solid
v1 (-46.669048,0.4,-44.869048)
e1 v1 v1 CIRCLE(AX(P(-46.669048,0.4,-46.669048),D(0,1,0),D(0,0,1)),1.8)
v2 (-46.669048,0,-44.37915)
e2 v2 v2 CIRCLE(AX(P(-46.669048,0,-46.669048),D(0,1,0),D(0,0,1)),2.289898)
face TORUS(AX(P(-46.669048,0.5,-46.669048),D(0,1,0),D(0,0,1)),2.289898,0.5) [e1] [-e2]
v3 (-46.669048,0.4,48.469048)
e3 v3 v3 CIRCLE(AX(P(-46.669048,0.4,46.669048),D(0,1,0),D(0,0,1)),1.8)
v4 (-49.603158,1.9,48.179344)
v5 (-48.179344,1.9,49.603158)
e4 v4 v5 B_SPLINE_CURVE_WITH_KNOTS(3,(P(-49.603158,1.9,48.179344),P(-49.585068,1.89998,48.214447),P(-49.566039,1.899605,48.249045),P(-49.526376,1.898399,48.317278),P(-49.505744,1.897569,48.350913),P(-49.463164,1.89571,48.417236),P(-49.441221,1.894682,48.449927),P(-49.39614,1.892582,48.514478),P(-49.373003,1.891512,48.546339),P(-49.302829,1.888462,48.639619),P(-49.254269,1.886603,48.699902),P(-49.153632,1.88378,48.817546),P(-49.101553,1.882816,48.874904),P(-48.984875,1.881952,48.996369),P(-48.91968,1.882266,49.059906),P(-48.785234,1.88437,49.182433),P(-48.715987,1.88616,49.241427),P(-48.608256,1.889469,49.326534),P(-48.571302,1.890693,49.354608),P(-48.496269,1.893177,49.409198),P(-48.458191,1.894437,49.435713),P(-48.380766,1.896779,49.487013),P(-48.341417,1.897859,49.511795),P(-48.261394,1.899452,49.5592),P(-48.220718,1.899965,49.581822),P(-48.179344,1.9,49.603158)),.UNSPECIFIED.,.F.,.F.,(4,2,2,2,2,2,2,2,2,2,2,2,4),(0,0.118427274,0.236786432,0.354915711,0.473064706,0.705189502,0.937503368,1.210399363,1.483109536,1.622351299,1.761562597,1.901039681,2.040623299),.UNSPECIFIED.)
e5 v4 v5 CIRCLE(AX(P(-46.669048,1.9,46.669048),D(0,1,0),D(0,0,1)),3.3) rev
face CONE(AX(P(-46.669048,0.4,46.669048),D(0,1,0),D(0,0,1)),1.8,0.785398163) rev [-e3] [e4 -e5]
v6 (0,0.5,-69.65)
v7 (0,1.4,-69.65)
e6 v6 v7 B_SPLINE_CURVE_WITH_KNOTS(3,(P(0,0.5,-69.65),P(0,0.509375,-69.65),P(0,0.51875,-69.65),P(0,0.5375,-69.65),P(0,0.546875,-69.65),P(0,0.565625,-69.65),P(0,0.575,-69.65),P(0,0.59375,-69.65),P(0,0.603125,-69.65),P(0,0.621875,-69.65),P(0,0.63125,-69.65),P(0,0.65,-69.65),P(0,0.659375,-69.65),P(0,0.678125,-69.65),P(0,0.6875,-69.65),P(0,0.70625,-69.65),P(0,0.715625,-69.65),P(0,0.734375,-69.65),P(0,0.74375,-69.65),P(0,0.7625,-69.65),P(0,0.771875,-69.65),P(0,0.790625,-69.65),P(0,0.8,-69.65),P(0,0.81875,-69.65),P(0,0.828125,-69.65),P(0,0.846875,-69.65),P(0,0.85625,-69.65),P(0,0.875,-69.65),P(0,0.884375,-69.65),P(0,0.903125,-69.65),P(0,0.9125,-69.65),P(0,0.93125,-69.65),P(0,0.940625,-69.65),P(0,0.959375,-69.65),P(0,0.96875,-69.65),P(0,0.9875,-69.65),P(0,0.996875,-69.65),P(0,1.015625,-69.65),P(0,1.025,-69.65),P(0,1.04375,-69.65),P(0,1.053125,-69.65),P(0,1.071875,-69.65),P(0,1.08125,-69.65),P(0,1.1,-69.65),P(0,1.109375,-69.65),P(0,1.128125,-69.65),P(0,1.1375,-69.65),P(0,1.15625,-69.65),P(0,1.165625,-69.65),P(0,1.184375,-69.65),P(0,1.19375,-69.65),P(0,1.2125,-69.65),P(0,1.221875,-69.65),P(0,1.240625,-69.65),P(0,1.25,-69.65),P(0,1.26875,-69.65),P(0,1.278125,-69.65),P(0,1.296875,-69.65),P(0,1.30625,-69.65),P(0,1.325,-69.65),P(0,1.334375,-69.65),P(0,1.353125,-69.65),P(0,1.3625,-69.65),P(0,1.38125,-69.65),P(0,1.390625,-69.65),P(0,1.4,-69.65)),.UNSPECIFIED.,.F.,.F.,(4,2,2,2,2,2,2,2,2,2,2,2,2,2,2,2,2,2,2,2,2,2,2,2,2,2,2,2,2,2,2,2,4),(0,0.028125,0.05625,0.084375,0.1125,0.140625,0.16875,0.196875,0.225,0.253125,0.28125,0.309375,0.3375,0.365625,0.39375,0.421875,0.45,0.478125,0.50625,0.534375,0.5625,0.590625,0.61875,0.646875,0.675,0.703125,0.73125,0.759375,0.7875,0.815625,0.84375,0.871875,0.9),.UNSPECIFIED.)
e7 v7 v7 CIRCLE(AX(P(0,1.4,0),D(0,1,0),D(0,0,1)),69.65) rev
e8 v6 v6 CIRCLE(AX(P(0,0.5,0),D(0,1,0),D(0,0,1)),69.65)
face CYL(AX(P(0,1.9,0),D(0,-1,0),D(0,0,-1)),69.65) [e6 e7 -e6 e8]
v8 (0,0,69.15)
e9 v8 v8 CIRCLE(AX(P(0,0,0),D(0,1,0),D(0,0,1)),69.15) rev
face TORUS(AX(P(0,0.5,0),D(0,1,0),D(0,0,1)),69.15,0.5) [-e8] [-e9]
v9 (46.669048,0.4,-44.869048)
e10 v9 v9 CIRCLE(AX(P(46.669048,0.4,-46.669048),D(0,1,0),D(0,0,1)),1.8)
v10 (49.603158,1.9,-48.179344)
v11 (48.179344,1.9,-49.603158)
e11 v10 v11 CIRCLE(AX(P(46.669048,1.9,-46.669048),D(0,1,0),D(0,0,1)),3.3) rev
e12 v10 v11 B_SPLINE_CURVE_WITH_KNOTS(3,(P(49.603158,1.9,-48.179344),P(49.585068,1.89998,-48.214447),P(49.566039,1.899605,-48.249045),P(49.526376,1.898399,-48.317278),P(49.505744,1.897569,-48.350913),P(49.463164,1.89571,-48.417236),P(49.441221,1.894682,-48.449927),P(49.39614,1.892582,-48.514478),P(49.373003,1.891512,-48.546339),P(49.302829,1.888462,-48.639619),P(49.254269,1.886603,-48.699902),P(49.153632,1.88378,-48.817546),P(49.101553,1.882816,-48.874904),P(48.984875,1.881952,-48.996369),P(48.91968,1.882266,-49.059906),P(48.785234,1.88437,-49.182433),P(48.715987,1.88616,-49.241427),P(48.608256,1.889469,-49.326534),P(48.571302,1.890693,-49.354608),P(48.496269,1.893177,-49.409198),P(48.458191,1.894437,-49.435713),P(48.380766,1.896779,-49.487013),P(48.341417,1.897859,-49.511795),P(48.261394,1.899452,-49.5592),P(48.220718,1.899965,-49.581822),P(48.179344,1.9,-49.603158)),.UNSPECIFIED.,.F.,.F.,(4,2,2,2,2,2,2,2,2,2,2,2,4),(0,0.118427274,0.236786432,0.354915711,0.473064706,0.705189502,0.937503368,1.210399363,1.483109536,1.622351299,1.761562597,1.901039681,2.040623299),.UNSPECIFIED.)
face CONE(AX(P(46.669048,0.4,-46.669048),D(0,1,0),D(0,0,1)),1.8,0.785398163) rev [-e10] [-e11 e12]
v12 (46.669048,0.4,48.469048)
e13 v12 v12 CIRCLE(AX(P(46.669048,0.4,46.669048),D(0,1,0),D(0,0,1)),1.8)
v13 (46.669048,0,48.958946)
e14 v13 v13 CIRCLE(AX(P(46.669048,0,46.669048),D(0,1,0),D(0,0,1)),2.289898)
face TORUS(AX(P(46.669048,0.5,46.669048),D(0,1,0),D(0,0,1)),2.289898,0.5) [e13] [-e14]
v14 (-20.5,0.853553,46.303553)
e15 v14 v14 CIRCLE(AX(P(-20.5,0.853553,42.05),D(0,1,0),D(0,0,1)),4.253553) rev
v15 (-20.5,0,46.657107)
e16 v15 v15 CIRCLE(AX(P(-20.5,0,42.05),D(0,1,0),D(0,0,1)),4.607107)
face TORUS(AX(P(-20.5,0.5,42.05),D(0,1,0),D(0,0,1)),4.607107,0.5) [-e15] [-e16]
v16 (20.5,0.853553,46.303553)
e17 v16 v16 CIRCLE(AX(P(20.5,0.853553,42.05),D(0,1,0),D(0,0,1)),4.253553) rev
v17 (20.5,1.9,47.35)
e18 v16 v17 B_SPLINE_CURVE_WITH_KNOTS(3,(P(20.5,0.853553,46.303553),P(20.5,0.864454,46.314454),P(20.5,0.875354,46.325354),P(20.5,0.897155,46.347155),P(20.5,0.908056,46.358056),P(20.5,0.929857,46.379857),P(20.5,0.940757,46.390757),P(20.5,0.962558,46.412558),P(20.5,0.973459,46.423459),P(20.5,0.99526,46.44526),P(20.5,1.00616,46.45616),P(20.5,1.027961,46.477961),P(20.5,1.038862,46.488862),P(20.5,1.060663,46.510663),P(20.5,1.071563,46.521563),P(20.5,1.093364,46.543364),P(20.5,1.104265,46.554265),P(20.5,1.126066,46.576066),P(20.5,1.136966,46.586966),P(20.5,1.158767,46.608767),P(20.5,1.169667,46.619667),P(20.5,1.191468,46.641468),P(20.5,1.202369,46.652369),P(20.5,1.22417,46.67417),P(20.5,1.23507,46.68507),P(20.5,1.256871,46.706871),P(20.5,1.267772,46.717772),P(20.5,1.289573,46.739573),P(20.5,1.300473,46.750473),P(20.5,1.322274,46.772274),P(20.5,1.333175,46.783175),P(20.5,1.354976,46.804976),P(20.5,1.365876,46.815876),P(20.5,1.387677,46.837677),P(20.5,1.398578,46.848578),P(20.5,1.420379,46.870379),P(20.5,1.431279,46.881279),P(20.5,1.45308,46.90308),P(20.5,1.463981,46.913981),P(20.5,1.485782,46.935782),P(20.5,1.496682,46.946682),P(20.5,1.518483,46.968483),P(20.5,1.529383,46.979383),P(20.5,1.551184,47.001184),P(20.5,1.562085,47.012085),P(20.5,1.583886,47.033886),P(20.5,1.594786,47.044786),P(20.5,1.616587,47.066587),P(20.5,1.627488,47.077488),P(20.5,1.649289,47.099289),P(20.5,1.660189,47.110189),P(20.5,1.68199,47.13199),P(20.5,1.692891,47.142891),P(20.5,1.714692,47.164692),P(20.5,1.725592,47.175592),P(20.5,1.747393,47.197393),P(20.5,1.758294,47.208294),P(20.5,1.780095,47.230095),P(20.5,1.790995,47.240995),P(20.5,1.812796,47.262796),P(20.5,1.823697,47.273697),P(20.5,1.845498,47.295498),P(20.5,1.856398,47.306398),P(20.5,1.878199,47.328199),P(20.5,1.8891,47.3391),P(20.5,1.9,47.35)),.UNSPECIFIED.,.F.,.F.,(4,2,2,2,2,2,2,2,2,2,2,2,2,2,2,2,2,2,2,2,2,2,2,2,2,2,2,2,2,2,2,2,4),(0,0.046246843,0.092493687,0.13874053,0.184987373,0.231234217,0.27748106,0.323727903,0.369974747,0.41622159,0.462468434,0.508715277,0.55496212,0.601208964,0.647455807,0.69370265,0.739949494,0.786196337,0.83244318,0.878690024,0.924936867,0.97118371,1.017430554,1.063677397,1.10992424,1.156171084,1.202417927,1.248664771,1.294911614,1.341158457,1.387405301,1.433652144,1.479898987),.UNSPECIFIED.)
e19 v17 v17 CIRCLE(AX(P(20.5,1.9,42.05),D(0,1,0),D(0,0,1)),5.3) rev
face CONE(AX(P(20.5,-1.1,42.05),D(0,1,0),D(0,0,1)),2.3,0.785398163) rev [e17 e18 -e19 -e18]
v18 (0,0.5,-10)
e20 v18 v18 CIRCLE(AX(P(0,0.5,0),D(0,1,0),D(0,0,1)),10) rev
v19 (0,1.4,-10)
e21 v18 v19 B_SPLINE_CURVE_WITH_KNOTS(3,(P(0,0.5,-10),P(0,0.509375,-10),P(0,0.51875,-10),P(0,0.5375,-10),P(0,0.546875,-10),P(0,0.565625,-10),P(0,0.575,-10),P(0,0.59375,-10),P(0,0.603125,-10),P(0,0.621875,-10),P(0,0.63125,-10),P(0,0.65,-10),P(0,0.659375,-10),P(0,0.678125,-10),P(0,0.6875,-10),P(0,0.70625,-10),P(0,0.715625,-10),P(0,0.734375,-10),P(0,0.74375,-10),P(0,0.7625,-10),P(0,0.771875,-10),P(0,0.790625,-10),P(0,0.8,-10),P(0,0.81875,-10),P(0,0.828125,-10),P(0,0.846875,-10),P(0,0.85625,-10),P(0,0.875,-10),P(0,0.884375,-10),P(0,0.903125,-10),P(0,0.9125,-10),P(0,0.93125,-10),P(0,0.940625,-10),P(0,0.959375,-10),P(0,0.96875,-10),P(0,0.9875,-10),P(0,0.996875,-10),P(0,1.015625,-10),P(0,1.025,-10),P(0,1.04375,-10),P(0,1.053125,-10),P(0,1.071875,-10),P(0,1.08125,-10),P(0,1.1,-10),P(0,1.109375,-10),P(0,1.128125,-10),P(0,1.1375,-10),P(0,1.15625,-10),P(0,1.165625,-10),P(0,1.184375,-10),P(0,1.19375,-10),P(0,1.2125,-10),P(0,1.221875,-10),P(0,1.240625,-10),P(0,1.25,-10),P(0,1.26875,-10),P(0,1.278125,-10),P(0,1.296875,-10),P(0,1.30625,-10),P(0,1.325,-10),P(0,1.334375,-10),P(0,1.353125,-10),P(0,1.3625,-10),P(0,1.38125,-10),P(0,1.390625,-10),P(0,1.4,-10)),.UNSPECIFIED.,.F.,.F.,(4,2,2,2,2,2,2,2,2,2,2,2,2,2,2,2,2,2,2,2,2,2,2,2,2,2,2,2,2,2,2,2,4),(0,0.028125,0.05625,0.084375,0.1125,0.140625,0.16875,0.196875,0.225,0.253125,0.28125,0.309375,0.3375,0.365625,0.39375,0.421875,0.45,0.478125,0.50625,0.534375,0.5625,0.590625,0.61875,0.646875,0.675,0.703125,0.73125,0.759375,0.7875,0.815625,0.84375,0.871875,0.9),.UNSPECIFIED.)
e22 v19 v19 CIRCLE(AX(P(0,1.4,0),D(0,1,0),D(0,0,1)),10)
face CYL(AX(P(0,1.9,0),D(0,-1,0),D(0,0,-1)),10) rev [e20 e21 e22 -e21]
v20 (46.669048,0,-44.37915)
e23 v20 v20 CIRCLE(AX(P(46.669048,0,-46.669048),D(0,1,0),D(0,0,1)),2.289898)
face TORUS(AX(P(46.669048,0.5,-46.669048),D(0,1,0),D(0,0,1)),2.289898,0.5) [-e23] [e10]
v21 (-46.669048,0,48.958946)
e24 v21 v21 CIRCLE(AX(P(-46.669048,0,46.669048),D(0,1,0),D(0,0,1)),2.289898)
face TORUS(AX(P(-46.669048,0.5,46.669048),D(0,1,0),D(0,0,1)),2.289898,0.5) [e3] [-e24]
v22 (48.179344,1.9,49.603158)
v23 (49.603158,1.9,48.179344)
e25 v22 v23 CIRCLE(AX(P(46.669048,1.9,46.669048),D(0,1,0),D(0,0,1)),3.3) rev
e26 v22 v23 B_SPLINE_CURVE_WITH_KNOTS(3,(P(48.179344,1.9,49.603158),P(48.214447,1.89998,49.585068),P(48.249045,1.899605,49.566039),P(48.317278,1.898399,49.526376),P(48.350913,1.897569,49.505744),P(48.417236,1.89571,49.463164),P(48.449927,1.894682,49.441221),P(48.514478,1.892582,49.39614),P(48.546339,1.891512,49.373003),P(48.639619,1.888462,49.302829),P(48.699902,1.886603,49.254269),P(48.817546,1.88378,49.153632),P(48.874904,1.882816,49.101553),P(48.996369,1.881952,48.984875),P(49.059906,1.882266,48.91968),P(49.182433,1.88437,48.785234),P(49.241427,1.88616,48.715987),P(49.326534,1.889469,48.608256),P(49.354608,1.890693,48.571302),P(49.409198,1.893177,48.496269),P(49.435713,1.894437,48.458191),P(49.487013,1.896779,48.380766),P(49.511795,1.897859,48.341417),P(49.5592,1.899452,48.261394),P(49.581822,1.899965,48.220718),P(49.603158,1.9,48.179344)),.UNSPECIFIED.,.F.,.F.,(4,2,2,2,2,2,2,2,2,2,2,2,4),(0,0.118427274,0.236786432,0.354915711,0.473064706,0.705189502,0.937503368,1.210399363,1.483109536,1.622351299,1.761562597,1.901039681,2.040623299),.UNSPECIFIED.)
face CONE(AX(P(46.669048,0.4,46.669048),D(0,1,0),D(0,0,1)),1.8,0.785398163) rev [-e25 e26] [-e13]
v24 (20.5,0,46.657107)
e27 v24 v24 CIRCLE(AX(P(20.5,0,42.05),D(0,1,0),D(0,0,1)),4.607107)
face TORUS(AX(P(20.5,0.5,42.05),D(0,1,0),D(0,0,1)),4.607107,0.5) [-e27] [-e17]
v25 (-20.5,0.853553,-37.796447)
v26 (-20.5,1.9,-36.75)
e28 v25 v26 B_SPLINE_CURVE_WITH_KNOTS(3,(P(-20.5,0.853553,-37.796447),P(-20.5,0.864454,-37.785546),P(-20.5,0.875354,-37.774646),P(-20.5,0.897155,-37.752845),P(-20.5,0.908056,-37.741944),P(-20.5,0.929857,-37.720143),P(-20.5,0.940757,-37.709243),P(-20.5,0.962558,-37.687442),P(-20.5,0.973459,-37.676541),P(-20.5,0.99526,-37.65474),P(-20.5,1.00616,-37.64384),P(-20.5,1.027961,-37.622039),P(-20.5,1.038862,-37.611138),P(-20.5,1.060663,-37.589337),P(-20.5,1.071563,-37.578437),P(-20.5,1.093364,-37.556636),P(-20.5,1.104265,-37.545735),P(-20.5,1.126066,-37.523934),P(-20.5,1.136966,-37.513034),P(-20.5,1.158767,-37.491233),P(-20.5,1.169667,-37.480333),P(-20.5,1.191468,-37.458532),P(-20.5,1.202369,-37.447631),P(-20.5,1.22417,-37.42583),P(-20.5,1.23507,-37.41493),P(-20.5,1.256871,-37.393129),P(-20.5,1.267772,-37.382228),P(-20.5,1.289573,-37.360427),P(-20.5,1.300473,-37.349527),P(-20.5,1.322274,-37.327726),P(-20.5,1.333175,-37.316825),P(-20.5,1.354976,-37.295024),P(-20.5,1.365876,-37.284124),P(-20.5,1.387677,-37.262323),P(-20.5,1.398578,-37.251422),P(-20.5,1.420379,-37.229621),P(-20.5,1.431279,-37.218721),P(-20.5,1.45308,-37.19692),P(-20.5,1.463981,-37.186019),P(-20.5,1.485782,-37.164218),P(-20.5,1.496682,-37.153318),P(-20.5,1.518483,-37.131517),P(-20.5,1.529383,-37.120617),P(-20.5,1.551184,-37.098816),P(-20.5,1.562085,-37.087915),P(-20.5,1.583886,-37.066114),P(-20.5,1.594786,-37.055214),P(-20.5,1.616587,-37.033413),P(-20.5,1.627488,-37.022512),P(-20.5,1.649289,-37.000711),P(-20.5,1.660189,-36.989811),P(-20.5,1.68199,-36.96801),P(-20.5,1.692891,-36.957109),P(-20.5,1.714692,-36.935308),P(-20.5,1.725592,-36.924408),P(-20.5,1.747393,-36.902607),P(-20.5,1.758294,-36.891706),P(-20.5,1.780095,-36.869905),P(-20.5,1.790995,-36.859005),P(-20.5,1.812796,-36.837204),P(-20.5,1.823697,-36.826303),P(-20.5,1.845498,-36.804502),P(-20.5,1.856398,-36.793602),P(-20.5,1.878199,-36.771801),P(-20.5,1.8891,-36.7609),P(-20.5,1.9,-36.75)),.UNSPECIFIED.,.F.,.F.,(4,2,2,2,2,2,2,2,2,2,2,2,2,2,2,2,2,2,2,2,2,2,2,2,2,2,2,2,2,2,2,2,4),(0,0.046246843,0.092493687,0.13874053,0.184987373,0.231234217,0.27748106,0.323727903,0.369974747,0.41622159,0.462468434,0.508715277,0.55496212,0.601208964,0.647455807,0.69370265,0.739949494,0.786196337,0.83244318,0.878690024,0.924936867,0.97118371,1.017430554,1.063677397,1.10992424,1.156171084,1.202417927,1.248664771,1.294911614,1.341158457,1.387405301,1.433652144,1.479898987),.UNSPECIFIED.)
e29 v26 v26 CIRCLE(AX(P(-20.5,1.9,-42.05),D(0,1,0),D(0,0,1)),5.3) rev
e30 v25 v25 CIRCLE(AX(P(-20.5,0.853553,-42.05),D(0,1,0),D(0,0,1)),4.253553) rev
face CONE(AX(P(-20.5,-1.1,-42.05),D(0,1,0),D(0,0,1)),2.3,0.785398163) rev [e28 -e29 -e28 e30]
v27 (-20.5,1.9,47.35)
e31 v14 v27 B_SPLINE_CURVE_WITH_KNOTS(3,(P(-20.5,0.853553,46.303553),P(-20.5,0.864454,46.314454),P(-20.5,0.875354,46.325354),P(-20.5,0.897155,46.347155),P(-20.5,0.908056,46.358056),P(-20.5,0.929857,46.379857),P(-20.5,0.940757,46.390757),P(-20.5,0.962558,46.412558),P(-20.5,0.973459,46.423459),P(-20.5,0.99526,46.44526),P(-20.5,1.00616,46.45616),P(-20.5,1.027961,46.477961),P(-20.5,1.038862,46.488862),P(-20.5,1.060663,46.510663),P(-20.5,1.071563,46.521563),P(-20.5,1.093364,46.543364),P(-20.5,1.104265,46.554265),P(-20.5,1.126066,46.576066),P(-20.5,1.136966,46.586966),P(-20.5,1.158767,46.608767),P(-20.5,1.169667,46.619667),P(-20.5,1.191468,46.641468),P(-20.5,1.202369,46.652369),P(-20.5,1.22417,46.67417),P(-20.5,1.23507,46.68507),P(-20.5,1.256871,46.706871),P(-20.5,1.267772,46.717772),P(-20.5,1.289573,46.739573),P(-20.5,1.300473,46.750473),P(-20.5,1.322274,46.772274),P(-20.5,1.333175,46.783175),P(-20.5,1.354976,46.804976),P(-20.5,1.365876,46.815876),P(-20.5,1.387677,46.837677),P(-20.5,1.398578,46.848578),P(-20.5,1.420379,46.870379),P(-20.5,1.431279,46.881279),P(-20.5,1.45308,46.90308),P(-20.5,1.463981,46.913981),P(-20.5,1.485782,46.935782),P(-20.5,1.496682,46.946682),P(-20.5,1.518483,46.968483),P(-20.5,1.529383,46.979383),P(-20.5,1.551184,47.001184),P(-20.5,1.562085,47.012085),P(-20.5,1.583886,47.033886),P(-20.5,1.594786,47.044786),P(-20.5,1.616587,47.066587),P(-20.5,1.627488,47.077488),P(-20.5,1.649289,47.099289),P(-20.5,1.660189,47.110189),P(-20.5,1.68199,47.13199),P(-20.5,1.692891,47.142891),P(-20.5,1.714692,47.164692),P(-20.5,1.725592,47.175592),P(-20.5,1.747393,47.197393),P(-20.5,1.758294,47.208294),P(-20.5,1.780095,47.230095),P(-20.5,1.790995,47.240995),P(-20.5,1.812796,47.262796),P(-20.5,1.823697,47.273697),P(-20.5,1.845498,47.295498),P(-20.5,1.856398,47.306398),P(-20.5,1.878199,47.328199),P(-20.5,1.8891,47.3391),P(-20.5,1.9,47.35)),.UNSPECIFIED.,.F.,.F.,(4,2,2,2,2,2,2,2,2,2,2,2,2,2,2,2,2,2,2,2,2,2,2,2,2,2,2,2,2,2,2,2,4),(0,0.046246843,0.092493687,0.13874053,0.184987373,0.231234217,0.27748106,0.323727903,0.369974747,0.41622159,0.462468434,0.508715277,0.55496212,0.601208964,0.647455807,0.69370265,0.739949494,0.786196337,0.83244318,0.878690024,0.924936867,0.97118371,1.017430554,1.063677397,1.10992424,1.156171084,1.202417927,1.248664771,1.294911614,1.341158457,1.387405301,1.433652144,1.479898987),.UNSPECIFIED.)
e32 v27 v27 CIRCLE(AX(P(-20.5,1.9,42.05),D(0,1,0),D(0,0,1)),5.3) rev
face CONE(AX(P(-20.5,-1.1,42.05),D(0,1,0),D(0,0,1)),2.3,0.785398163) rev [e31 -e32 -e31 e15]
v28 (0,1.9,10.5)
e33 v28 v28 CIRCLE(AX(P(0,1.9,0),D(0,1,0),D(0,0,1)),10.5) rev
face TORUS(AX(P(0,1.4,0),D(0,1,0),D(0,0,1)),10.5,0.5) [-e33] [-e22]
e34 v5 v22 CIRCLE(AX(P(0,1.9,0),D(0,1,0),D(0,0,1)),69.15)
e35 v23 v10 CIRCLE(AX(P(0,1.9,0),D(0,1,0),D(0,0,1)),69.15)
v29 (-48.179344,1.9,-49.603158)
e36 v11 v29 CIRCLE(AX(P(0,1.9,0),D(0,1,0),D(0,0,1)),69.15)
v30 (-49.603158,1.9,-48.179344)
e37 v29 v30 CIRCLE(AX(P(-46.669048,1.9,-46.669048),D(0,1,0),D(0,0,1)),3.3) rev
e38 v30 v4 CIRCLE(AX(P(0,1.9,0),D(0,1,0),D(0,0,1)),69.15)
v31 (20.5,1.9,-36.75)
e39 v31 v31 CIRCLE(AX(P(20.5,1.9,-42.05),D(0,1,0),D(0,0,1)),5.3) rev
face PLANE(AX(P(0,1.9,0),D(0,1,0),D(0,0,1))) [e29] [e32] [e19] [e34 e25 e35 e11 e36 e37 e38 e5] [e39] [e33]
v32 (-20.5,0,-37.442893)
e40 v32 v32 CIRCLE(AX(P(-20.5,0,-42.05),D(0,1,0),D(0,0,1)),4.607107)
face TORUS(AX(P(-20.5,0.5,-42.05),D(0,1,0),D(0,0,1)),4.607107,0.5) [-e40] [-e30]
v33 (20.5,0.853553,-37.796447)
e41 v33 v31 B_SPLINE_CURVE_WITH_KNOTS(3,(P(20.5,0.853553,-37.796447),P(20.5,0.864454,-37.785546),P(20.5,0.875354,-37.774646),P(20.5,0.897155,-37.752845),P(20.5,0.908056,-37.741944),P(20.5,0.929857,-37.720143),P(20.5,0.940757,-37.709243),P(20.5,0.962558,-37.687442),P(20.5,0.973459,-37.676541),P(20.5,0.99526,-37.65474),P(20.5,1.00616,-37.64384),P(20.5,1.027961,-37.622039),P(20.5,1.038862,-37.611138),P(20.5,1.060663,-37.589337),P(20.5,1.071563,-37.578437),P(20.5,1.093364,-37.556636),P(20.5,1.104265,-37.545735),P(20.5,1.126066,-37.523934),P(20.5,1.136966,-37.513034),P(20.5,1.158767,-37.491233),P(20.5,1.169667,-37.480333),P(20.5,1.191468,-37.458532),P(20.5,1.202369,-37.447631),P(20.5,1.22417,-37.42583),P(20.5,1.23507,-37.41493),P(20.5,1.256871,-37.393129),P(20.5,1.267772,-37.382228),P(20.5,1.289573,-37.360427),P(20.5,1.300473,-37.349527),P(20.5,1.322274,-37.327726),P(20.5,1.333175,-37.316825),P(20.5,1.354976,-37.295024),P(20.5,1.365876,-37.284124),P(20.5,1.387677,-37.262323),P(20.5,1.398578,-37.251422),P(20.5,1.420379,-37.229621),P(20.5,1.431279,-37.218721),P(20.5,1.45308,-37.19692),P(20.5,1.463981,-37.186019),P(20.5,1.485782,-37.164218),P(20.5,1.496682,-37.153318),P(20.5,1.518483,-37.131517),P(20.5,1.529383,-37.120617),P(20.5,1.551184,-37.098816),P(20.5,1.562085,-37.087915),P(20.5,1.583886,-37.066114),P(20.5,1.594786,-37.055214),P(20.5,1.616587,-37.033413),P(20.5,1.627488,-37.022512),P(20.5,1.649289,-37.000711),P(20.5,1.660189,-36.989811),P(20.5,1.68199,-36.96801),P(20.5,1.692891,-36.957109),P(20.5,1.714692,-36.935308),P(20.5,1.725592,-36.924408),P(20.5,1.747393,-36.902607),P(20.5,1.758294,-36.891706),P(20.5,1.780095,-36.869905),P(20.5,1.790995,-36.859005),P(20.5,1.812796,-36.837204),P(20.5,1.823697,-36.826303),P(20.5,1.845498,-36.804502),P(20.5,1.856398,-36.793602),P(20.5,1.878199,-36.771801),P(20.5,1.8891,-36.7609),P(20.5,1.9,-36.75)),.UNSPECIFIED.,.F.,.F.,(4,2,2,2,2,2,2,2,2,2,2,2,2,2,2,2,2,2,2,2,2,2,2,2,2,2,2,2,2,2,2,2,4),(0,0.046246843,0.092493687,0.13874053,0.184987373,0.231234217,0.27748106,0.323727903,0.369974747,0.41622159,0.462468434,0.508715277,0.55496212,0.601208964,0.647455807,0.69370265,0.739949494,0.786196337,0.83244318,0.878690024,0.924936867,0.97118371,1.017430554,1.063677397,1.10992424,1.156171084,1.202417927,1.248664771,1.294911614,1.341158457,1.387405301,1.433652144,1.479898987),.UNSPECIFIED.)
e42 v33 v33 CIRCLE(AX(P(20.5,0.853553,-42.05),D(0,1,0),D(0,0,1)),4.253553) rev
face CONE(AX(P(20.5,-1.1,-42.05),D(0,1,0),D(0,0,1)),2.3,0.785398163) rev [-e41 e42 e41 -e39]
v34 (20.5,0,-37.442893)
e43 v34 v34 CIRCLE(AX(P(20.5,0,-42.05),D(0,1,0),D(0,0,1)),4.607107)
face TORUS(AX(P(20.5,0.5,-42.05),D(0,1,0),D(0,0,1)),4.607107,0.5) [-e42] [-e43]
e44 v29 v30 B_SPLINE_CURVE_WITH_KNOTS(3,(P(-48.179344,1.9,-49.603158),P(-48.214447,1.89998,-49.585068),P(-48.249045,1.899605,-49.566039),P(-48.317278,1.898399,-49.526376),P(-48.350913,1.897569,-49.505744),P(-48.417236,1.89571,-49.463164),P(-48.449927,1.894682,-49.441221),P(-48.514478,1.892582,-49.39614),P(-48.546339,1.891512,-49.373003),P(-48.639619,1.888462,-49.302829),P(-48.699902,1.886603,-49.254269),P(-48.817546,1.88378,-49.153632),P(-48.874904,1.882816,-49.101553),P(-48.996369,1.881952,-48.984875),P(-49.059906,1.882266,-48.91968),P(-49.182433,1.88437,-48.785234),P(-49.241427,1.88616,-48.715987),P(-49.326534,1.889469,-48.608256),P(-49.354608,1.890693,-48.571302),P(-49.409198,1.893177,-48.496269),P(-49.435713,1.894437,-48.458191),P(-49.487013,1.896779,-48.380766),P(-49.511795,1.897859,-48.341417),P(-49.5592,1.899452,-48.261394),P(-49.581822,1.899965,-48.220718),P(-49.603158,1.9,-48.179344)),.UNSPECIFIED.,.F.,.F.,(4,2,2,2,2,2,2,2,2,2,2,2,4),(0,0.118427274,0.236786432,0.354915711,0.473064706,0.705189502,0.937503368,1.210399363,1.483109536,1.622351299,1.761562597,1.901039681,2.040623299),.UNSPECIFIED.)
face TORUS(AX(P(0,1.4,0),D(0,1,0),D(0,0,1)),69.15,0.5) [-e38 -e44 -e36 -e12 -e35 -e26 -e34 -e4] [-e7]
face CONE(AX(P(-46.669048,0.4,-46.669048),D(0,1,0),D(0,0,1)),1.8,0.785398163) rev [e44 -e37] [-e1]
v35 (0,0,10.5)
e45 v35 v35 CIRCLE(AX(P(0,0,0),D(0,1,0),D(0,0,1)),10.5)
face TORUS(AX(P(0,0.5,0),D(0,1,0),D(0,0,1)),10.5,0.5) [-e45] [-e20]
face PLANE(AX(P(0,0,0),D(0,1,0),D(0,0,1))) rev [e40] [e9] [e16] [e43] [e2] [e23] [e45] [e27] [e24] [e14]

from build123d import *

# Parameters (mm, degrees)
SKETCH1_R           = 69.65
SKETCH1_R_2         = 2.3
SKETCH1_R_3         = 10
SKETCH1_R_4         = 1.8
BOSS_EXTRUDE1_DEPTH = 1.9
CHAMFER1_SIZE       = 3
CHAMFER3_SIZE       = 1.5
FILLET2_R           = 0.5


with BuildPart() as part:
    # Sketch1 → Boss-Extrude1 (new body)
    with BuildSketch(Plane(origin=(0, 0, 0), x_dir=(1, 0, 0), z_dir=(0, 1, 0))):
        with Locations(Location((0, 0, 0), (0, 0, 90))):
            Circle(SKETCH1_R)
        with Locations(Location((-20.5, 42.05, 0), (0, 0, 90))):
            Circle(SKETCH1_R_2, mode=Mode.SUBTRACT)
        with Locations(Location((20.5, 42.05, 0), (0, 0, 90))):
            Circle(SKETCH1_R_2, mode=Mode.SUBTRACT)
        with Locations(Location((20.5, -42.05, 0), (0, 0, 90))):
            Circle(SKETCH1_R_2, mode=Mode.SUBTRACT)
        with Locations(Location((-20.5, -42.05, 0), (0, 0, 90))):
            Circle(SKETCH1_R_2, mode=Mode.SUBTRACT)
        with Locations(Location((0, 0, 0), (0, 0, 90))):
            Circle(SKETCH1_R_3, mode=Mode.SUBTRACT)
        with Locations(Location((-46.669047558, 46.669047558, 0), (0, 0, 90))):
            Circle(SKETCH1_R_4, mode=Mode.SUBTRACT)
        with Locations(Location((46.669047558, 46.669047558, 0), (0, 0, 90))):
            Circle(SKETCH1_R_4, mode=Mode.SUBTRACT)
        with Locations(Location((46.669047558, -46.669047558, 0), (0, 0, 90))):
            Circle(SKETCH1_R_4, mode=Mode.SUBTRACT)
        with Locations(Location((-46.669047558, -46.669047558, 0), (0, 0, 90))):
            Circle(SKETCH1_R_4, mode=Mode.SUBTRACT)
    extrude(amount=BOSS_EXTRUDE1_DEPTH)

    # Chamfer1
    # the kernel refuses this chamfer: 3 mm, written as the material it takes off along each edge
    with BuildSketch(Plane(origin=(-20.5, 1.9, -42.05), x_dir=(0, 0, -1), z_dir=(1, 0, 0))) as chamfer1_piece_1:
        Polygon((2.3, -CHAMFER1_SIZE), (2.3 + CHAMFER1_SIZE, 0), (2.3, 0), align=None)
    revolve(axis=Axis((-20.5, 1.9, -42.05), (0, 1, 0)), mode=Mode.SUBTRACT)
    with BuildSketch(Plane(origin=(20.5, 1.9, -42.05), x_dir=(0, 0, -1), z_dir=(1, 0, 0))) as chamfer1_piece_2:
        Polygon((2.3, -CHAMFER1_SIZE), (2.3 + CHAMFER1_SIZE, 0), (2.3, 0), align=None)
    revolve(axis=Axis((20.5, 1.9, -42.05), (0, 1, 0)), mode=Mode.SUBTRACT)
    with BuildSketch(Plane(origin=(20.5, 1.9, 42.05), x_dir=(0, 0, -1), z_dir=(1, 0, 0))) as chamfer1_piece_3:
        Polygon((2.3, -CHAMFER1_SIZE), (2.3 + CHAMFER1_SIZE, 0), (2.3, 0), align=None)
    revolve(axis=Axis((20.5, 1.9, 42.05), (0, 1, 0)), mode=Mode.SUBTRACT)
    with BuildSketch(Plane(origin=(-20.5, 1.9, 42.05), x_dir=(0, 0, -1), z_dir=(1, 0, 0))) as chamfer1_piece_4:
        Polygon((2.3, -CHAMFER1_SIZE), (2.3 + CHAMFER1_SIZE, 0), (2.3, 0), align=None)
    revolve(axis=Axis((-20.5, 1.9, 42.05), (0, 1, 0)), mode=Mode.SUBTRACT)

    # Chamfer3
    chamfer3_edges = [part.edges().sort_by_distance(p)[0] for p in [
        (-46.669047558, 1.9, 48.469047558),
        (46.669047558, 1.9, 48.469047558),
        (46.669047558, 1.9, -44.869047558),
        (-46.669047558, 1.9, -44.869047558),
    ]]
    chamfer(chamfer3_edges, length=CHAMFER3_SIZE)

    # Fillet2
    # the kernel refuses this fillet: 0.5 mm, written as the material it takes off along each edge
    with BuildSketch(Plane(origin=(0, 0, 0), x_dir=(0, 0, -1), z_dir=(1, 0, 0))) as fillet2_piece_1:
        with BuildLine():
            CenterArc((69.65 - FILLET2_R, FILLET2_R), FILLET2_R, 270, 90)
            Line((69.65 - FILLET2_R, 0), (69.65 - FILLET2_R, -FILLET2_R * 0.02))
            Line((69.65 - FILLET2_R, -FILLET2_R * 0.02), (69.65 + FILLET2_R * 0.02, -FILLET2_R * 0.02))
            Line((69.65 + FILLET2_R * 0.02, -FILLET2_R * 0.02), (69.65 + FILLET2_R * 0.02, FILLET2_R))
            Line((69.65 + FILLET2_R * 0.02, FILLET2_R), (69.65, FILLET2_R))
        make_face()
    revolve(axis=Axis((0, 0, 0), (0, 1, 0)), mode=Mode.SUBTRACT)
    with BuildSketch(Plane(origin=(0, 0, 0), x_dir=(0, 0, -1), z_dir=(1, 0, 0))) as fillet2_piece_2:
        with BuildLine():
            CenterArc((10 + FILLET2_R, FILLET2_R), FILLET2_R, 180, 90)
            Line((10 + FILLET2_R, 0), (10 + FILLET2_R, -FILLET2_R * 0.02))
            Line((10 + FILLET2_R, -FILLET2_R * 0.02), (10 - FILLET2_R * 0.02, -FILLET2_R * 0.02))
            Line((10 - FILLET2_R * 0.02, -FILLET2_R * 0.02), (10 - FILLET2_R * 0.02, FILLET2_R))
            Line((10 - FILLET2_R * 0.02, FILLET2_R), (10, FILLET2_R))
        make_face()
    revolve(axis=Axis((0, 0, 0), (0, 1, 0)), mode=Mode.SUBTRACT)
    with BuildSketch(Plane(origin=(-46.669047558, 0, -46.669047558), x_dir=(0, 0, -1), z_dir=(1, 0, 0))) as fillet2_piece_3:
        with BuildLine():
            CenterArc((2.289897949, 0.5), FILLET2_R, 191.536959033, 78.463040967)
            Line((1.8, 0.4), (1.790202041, 0.398))
            ThreePointArc((1.790202041, 0.398), (1.79, 0.2), (1.79, 0))
            Line((1.79, 0), (1.8, -0.01))
            Line((1.8, -0.01), (2.289897949, -0.01))
            Line((2.289897949, -0.01), (2.289897949, 0))
        make_face()
    revolve(axis=Axis((-46.669047558, 0, -46.669047558), (0, 1, 0)), mode=Mode.SUBTRACT)
    with BuildSketch(Plane(origin=(46.669047558, 0, -46.669047558), x_dir=(0, 0, -1), z_dir=(1, 0, 0))) as fillet2_piece_4:
        with BuildLine():
            CenterArc((2.289897949, 0.5), FILLET2_R, 191.536959033, 78.463040967)
            Line((1.8, 0.4), (1.790202041, 0.398))
            ThreePointArc((1.790202041, 0.398), (1.79, 0.2), (1.79, 0))
            Line((1.79, 0), (1.8, -0.01))
            Line((1.8, -0.01), (2.289897949, -0.01))
            Line((2.289897949, -0.01), (2.289897949, 0))
        make_face()
    revolve(axis=Axis((46.669047558, 0, -46.669047558), (0, 1, 0)), mode=Mode.SUBTRACT)
    with BuildSketch(Plane(origin=(46.669047558, 0, 46.669047558), x_dir=(0, 0, -1), z_dir=(1, 0, 0))) as fillet2_piece_5:
        with BuildLine():
            CenterArc((2.289897949, 0.5), FILLET2_R, 191.536959033, 78.463040967)
            Line((1.8, 0.4), (1.790202041, 0.398))
            ThreePointArc((1.790202041, 0.398), (1.79, 0.2), (1.79, 0))
            Line((1.79, 0), (1.8, -0.01))
            Line((1.8, -0.01), (2.289897949, -0.01))
            Line((2.289897949, -0.01), (2.289897949, 0))
        make_face()
    revolve(axis=Axis((46.669047558, 0, 46.669047558), (0, 1, 0)), mode=Mode.SUBTRACT)
    with BuildSketch(Plane(origin=(-46.669047558, 0, 46.669047558), x_dir=(0, 0, -1), z_dir=(1, 0, 0))) as fillet2_piece_6:
        with BuildLine():
            CenterArc((2.289897949, 0.5), FILLET2_R, 191.536959033, 78.463040967)
            Line((2.289897949, 0), (2.289897949, -0.01))
            Line((2.289897949, -0.01), (1.8, -0.01))
            Line((1.8, -0.01), (1.79, 0))
            ThreePointArc((1.79, 0), (1.79, 0.2), (1.790202041, 0.398))
            Line((1.790202041, 0.398), (1.8, 0.4))
        make_face()
    revolve(axis=Axis((-46.669047558, 0, 46.669047558), (0, 1, 0)), mode=Mode.SUBTRACT)
    with BuildSketch(Plane(origin=(-20.5, 0, 42.05), x_dir=(0, 0, -1), z_dir=(1, 0, 0))) as fillet2_piece_7:
        with BuildLine():
            CenterArc((3.4 + FILLET2_R * 2.41421356237, FILLET2_R), FILLET2_R, 135, 135)
            Line((3.4 + FILLET2_R * 2.41421356237, 0), (3.4 + FILLET2_R * 2.41421356237, -FILLET2_R * 0.02))
            Line((3.4 + FILLET2_R * 2.41421356237, -FILLET2_R * 0.02), (3.4, -FILLET2_R * 0.02))
            Line((3.4, -FILLET2_R * 0.02), (3.4 - FILLET2_R * 0.0141421356237, FILLET2_R * 0.0141421356237))
            Line((3.4 - FILLET2_R * 0.0141421356237, FILLET2_R * 0.0141421356237), (3.4 + FILLET2_R * 1.69296464556, FILLET2_R * 1.72124891681))
            Line((3.4 + FILLET2_R * 1.69296464556, FILLET2_R * 1.72124891681), (3.4 + FILLET2_R * 1.70710678119, FILLET2_R * 1.70710678119))
        make_face()
    revolve(axis=Axis((-20.5, 0, 42.05), (0, 1, 0)), mode=Mode.SUBTRACT)
    with BuildSketch(Plane(origin=(20.5, 0, 42.05), x_dir=(0, 0, -1), z_dir=(1, 0, 0))) as fillet2_piece_8:
        with BuildLine():
            CenterArc((3.4 + FILLET2_R * 2.41421356237, FILLET2_R), FILLET2_R, 135, 135)
            Line((3.4 + FILLET2_R * 2.41421356237, 0), (3.4 + FILLET2_R * 2.41421356237, -FILLET2_R * 0.02))
            Line((3.4 + FILLET2_R * 2.41421356237, -FILLET2_R * 0.02), (3.4, -FILLET2_R * 0.02))
            Line((3.4, -FILLET2_R * 0.02), (3.4 - FILLET2_R * 0.0141421356237, FILLET2_R * 0.0141421356237))
            Line((3.4 - FILLET2_R * 0.0141421356237, FILLET2_R * 0.0141421356237), (3.4 + FILLET2_R * 1.69296464556, FILLET2_R * 1.72124891681))
            Line((3.4 + FILLET2_R * 1.69296464556, FILLET2_R * 1.72124891681), (3.4 + FILLET2_R * 1.70710678119, FILLET2_R * 1.70710678119))
        make_face()
    revolve(axis=Axis((20.5, 0, 42.05), (0, 1, 0)), mode=Mode.SUBTRACT)
    with BuildSketch(Plane(origin=(20.5, 0, -42.05), x_dir=(0, 0, -1), z_dir=(1, 0, 0))) as fillet2_piece_9:
        with BuildLine():
            CenterArc((3.4 + FILLET2_R * 2.41421356237, FILLET2_R), FILLET2_R, 135, 135)
            Line((3.4 + FILLET2_R * 2.41421356237, 0), (3.4 + FILLET2_R * 2.41421356237, -FILLET2_R * 0.02))
            Line((3.4 + FILLET2_R * 2.41421356237, -FILLET2_R * 0.02), (3.4, -FILLET2_R * 0.02))
            Line((3.4, -FILLET2_R * 0.02), (3.4 - FILLET2_R * 0.0141421356237, FILLET2_R * 0.0141421356237))
            Line((3.4 - FILLET2_R * 0.0141421356237, FILLET2_R * 0.0141421356237), (3.4 + FILLET2_R * 1.69296464556, FILLET2_R * 1.72124891681))
            Line((3.4 + FILLET2_R * 1.69296464556, FILLET2_R * 1.72124891681), (3.4 + FILLET2_R * 1.70710678119, FILLET2_R * 1.70710678119))
        make_face()
    revolve(axis=Axis((20.5, 0, -42.05), (0, 1, 0)), mode=Mode.SUBTRACT)
    with BuildSketch(Plane(origin=(-20.5, 0, -42.05), x_dir=(0, 0, -1), z_dir=(1, 0, 0))) as fillet2_piece_10:
        with BuildLine():
            CenterArc((3.4 + FILLET2_R * 2.41421356237, FILLET2_R), FILLET2_R, 135, 135)
            Line((3.4 + FILLET2_R * 2.41421356237, 0), (3.4 + FILLET2_R * 2.41421356237, -FILLET2_R * 0.02))
            Line((3.4 + FILLET2_R * 2.41421356237, -FILLET2_R * 0.02), (3.4, -FILLET2_R * 0.02))
            Line((3.4, -FILLET2_R * 0.02), (3.4 - FILLET2_R * 0.0141421356237, FILLET2_R * 0.0141421356237))
            Line((3.4 - FILLET2_R * 0.0141421356237, FILLET2_R * 0.0141421356237), (3.4 + FILLET2_R * 1.69296464556, FILLET2_R * 1.72124891681))
            Line((3.4 + FILLET2_R * 1.69296464556, FILLET2_R * 1.72124891681), (3.4 + FILLET2_R * 1.70710678119, FILLET2_R * 1.70710678119))
        make_face()
    revolve(axis=Axis((-20.5, 0, -42.05), (0, 1, 0)), mode=Mode.SUBTRACT)
    with BuildSketch(Plane(origin=(0, 1.9, 0), x_dir=(0, 0, -1), z_dir=(1, 0, 0))) as fillet2_piece_11:
        with BuildLine():
            CenterArc((10 + FILLET2_R, -FILLET2_R), FILLET2_R, 90, 90)
            Line((10, -FILLET2_R), (10 - FILLET2_R * 0.02, -FILLET2_R))
            Line((10 - FILLET2_R * 0.02, -FILLET2_R), (10 - FILLET2_R * 0.02, FILLET2_R * 0.02))
            Line((10 - FILLET2_R * 0.02, FILLET2_R * 0.02), (10 + FILLET2_R, FILLET2_R * 0.02))
            Line((10 + FILLET2_R, FILLET2_R * 0.02), (10 + FILLET2_R, 0))
        make_face()
    revolve(axis=Axis((0, 1.9, 0), (0, 1, 0)), mode=Mode.SUBTRACT)
    with BuildSketch(Plane(origin=(0, 1.9, 0), x_dir=(0, 0, -1), z_dir=(1, 0, 0))) as fillet2_piece_12:
        with BuildLine():
            CenterArc((69.65 - FILLET2_R, -FILLET2_R), FILLET2_R, 0, 90)
            Line((69.65, -FILLET2_R), (69.65 + FILLET2_R * 0.02, -FILLET2_R))
            Line((69.65 + FILLET2_R * 0.02, -FILLET2_R), (69.65 + FILLET2_R * 0.02, FILLET2_R * 0.02))
            Line((69.65 + FILLET2_R * 0.02, FILLET2_R * 0.02), (69.65 - FILLET2_R, FILLET2_R * 0.02))
            Line((69.65 - FILLET2_R, FILLET2_R * 0.02), (69.65 - FILLET2_R, 0))
        make_face()
    revolve(axis=Axis((0, 1.9, 0), (0, 1, 0)), mode=Mode.SUBTRACT)


solid = part.part
